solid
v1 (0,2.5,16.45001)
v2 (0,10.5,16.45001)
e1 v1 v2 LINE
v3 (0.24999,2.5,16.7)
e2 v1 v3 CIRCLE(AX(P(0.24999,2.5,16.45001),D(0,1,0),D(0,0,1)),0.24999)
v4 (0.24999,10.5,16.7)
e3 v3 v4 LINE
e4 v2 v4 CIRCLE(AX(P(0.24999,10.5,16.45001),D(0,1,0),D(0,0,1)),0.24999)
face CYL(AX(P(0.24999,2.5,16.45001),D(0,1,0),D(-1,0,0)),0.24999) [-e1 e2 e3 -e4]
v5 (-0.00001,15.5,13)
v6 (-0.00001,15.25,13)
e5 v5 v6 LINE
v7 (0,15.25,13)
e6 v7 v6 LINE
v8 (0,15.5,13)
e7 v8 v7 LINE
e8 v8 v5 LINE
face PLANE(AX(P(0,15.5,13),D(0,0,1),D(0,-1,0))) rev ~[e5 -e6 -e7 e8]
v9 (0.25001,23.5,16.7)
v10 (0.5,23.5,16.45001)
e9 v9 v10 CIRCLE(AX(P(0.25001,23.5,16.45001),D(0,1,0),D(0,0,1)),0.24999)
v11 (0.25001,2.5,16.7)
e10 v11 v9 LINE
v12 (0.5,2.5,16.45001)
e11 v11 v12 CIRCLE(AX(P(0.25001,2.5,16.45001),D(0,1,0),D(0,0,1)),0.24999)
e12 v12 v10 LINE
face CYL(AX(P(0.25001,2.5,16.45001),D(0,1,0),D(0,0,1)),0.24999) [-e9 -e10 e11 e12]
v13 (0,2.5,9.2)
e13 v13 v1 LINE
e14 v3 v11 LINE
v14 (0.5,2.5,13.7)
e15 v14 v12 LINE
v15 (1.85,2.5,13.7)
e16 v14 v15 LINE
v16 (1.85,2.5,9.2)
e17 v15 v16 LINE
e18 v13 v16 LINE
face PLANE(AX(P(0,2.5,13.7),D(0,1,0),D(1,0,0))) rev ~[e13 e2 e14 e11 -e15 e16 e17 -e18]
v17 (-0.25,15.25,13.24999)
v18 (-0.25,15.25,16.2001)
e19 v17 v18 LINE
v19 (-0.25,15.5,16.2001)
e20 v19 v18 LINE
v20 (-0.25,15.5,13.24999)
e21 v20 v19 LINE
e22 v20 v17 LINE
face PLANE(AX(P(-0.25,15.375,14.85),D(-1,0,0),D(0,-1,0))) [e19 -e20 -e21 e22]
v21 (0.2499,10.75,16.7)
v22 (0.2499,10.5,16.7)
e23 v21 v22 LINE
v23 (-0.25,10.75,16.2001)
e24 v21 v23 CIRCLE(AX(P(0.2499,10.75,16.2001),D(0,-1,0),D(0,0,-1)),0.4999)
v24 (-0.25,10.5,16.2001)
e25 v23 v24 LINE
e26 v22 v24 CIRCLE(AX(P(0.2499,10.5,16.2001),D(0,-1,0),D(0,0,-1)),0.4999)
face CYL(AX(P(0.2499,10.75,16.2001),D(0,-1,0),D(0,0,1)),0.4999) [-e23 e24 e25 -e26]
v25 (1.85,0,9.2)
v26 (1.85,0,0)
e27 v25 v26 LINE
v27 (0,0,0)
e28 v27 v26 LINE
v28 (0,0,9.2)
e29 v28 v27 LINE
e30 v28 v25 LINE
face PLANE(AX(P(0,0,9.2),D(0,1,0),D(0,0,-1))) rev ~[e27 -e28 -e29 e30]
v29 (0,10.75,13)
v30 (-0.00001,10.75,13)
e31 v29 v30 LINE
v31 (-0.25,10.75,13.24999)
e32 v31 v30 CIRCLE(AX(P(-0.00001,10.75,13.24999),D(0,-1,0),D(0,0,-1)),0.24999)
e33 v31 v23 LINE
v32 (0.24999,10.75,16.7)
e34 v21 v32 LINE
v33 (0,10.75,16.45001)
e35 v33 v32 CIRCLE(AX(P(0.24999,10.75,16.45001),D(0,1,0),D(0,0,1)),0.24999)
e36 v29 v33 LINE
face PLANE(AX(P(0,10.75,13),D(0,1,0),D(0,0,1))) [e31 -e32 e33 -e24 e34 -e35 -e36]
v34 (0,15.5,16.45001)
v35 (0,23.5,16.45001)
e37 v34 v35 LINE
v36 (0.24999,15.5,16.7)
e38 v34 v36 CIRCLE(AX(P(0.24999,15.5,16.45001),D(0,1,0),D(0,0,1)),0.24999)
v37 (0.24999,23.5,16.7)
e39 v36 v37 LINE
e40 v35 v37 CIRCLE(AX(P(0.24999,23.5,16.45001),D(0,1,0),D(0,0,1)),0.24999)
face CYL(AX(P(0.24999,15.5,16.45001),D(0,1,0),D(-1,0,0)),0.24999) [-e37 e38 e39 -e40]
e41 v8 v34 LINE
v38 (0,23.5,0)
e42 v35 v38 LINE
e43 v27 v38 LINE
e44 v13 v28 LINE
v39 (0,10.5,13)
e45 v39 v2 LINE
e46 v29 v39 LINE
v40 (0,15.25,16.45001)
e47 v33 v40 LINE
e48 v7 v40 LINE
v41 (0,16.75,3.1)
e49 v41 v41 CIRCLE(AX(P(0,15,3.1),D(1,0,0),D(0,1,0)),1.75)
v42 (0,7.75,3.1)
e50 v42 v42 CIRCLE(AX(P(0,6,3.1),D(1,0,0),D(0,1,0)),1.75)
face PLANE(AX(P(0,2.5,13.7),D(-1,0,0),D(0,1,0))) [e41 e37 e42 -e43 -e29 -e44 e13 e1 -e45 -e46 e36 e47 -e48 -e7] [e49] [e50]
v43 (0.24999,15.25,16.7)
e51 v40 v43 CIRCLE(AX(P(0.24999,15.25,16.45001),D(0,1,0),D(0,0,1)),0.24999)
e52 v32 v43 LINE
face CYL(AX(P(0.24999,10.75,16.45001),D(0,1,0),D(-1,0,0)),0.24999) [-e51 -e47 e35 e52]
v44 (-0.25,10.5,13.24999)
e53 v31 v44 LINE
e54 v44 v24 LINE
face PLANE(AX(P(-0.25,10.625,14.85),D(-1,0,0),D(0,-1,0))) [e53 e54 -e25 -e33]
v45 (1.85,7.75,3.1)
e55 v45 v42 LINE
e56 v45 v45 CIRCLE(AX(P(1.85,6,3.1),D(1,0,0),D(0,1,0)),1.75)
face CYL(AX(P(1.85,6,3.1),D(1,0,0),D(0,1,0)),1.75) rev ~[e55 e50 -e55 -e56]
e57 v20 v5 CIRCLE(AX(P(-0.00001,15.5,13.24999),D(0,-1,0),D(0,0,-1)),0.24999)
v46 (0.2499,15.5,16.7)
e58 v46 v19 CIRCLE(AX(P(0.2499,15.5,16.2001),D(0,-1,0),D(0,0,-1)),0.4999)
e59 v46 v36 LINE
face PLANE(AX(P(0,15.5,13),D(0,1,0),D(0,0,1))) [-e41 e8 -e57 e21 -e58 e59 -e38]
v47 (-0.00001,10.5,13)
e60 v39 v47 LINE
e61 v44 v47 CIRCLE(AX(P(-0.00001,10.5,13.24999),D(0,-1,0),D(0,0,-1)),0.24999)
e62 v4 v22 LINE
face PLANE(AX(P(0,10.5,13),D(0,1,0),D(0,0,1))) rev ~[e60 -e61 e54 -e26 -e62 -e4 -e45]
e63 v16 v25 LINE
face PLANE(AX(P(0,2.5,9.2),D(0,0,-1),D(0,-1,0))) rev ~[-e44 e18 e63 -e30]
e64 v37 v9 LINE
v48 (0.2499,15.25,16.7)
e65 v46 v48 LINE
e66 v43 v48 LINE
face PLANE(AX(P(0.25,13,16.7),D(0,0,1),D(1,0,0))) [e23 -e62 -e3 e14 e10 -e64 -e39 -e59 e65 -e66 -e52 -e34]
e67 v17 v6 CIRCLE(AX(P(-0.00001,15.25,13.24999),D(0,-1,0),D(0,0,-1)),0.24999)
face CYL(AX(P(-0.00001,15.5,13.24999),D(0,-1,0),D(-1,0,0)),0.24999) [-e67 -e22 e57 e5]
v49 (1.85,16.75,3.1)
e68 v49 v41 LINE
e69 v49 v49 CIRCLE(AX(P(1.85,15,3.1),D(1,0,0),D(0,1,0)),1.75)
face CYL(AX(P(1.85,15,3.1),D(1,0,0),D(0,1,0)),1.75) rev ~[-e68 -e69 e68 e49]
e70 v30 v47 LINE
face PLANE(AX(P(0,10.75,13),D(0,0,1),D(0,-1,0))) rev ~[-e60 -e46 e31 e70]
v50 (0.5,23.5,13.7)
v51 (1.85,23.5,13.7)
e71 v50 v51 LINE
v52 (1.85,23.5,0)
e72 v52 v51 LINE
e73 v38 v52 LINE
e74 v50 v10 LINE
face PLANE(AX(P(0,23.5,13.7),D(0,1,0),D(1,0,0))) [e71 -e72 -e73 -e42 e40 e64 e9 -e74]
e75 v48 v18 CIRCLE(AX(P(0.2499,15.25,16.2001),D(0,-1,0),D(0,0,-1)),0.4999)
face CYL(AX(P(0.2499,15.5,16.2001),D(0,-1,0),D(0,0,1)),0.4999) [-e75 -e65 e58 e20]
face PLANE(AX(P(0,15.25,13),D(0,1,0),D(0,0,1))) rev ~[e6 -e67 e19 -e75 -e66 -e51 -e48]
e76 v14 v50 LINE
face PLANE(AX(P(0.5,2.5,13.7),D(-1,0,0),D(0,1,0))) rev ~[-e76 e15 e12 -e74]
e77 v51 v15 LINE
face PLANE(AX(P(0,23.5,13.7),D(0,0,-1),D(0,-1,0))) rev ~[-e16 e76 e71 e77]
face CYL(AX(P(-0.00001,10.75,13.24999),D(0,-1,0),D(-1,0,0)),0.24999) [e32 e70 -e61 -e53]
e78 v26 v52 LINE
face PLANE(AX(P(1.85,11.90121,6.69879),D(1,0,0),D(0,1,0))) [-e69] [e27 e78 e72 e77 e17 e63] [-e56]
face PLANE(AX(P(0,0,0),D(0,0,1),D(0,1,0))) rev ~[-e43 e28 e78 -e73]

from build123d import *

# Parameters (mm, degrees)
F1_DEPTH = 1.85
F2_W     = 0.5
F2_H     = 21
F3_DEPTH = 3
F4_R     = 1.75
F5_DEPTH = 1.851
F6_W     = 0.25
F6_H     = 3.7
F7_DEPTH = 0.25
F8_R     = 0.24999
F9_R     = 0.4999
F10_R    = 0.24999


# Not quite as in the source:
# - a fillet or chamfer is up to 0.001 mm smaller than in the source, because OpenCascade refuses the exact size


with BuildPart() as f1:
    # F0 (on Right) → F1 (new body)
    with BuildSketch(Plane.YZ):
        Polygon((0, 9.2), (0, 0), (23.5, 0), (23.5, 13.7), (2.5, 13.7), (2.5, 9.2), align=None)
    extrude(amount=F1_DEPTH)

    # F2 (on face) → F3 (join)
    with BuildSketch(Plane.XY.offset(13.7)):
        with Locations((0.25, 13)):
            Rectangle(F2_W, F2_H)
    extrude(amount=F3_DEPTH)

    # F4 (on face) → F5 (cut, through all)
    with BuildSketch(Plane.YZ.offset(1.85)):
        with Locations((6, 3.1)):
            Circle(F4_R)
        with Locations((15, 3.1)):
            Circle(F4_R)
    extrude(amount=-F5_DEPTH, mode=Mode.SUBTRACT)

    # F6 (on face) → F7 (join)
    with BuildSketch(Plane(origin=(0, 0, 0), x_dir=(0, -1, 0), z_dir=(-1, 0, 0))):
        with Locations((-15.375, 14.85)):
            Rectangle(F6_W, F6_H)
        with Locations((-10.625, 14.85)):
            Rectangle(F6_W, F6_H)
    extrude(amount=F7_DEPTH)

    # F8 (radius 0.25 in the source; OpenCascade refuses exactly that, so slightly less here)
    f8_edges = [f1.edges().sort_by_distance(p)[0] for p in [
        (0, 6.5, 16.7),
        (0, 13, 16.7),
        (0, 19.5, 16.7),
        (0.5, 13, 16.7),
    ]]
    fillet(f8_edges, radius=F8_R)

    # F9 (radius 0.5 in the source; OpenCascade refuses exactly that, so slightly less here)
    f9_edges = [f1.edges().sort_by_distance(p)[0] for p in [
        (-0.25, 15.375, 16.7),
        (-0.25, 10.625, 16.7),
    ]]
    fillet(f9_edges, radius=F9_R)

    # F10 (radius 0.25 in the source; OpenCascade refuses exactly that, so slightly less here)
    f10_edges = [f1.edges().sort_by_distance(p)[0] for p in [
        (-0.25, 10.625, 13),
        (-0.25, 15.375, 13),
    ]]
    fillet(f10_edges, radius=F10_R)


solid = f1.part
